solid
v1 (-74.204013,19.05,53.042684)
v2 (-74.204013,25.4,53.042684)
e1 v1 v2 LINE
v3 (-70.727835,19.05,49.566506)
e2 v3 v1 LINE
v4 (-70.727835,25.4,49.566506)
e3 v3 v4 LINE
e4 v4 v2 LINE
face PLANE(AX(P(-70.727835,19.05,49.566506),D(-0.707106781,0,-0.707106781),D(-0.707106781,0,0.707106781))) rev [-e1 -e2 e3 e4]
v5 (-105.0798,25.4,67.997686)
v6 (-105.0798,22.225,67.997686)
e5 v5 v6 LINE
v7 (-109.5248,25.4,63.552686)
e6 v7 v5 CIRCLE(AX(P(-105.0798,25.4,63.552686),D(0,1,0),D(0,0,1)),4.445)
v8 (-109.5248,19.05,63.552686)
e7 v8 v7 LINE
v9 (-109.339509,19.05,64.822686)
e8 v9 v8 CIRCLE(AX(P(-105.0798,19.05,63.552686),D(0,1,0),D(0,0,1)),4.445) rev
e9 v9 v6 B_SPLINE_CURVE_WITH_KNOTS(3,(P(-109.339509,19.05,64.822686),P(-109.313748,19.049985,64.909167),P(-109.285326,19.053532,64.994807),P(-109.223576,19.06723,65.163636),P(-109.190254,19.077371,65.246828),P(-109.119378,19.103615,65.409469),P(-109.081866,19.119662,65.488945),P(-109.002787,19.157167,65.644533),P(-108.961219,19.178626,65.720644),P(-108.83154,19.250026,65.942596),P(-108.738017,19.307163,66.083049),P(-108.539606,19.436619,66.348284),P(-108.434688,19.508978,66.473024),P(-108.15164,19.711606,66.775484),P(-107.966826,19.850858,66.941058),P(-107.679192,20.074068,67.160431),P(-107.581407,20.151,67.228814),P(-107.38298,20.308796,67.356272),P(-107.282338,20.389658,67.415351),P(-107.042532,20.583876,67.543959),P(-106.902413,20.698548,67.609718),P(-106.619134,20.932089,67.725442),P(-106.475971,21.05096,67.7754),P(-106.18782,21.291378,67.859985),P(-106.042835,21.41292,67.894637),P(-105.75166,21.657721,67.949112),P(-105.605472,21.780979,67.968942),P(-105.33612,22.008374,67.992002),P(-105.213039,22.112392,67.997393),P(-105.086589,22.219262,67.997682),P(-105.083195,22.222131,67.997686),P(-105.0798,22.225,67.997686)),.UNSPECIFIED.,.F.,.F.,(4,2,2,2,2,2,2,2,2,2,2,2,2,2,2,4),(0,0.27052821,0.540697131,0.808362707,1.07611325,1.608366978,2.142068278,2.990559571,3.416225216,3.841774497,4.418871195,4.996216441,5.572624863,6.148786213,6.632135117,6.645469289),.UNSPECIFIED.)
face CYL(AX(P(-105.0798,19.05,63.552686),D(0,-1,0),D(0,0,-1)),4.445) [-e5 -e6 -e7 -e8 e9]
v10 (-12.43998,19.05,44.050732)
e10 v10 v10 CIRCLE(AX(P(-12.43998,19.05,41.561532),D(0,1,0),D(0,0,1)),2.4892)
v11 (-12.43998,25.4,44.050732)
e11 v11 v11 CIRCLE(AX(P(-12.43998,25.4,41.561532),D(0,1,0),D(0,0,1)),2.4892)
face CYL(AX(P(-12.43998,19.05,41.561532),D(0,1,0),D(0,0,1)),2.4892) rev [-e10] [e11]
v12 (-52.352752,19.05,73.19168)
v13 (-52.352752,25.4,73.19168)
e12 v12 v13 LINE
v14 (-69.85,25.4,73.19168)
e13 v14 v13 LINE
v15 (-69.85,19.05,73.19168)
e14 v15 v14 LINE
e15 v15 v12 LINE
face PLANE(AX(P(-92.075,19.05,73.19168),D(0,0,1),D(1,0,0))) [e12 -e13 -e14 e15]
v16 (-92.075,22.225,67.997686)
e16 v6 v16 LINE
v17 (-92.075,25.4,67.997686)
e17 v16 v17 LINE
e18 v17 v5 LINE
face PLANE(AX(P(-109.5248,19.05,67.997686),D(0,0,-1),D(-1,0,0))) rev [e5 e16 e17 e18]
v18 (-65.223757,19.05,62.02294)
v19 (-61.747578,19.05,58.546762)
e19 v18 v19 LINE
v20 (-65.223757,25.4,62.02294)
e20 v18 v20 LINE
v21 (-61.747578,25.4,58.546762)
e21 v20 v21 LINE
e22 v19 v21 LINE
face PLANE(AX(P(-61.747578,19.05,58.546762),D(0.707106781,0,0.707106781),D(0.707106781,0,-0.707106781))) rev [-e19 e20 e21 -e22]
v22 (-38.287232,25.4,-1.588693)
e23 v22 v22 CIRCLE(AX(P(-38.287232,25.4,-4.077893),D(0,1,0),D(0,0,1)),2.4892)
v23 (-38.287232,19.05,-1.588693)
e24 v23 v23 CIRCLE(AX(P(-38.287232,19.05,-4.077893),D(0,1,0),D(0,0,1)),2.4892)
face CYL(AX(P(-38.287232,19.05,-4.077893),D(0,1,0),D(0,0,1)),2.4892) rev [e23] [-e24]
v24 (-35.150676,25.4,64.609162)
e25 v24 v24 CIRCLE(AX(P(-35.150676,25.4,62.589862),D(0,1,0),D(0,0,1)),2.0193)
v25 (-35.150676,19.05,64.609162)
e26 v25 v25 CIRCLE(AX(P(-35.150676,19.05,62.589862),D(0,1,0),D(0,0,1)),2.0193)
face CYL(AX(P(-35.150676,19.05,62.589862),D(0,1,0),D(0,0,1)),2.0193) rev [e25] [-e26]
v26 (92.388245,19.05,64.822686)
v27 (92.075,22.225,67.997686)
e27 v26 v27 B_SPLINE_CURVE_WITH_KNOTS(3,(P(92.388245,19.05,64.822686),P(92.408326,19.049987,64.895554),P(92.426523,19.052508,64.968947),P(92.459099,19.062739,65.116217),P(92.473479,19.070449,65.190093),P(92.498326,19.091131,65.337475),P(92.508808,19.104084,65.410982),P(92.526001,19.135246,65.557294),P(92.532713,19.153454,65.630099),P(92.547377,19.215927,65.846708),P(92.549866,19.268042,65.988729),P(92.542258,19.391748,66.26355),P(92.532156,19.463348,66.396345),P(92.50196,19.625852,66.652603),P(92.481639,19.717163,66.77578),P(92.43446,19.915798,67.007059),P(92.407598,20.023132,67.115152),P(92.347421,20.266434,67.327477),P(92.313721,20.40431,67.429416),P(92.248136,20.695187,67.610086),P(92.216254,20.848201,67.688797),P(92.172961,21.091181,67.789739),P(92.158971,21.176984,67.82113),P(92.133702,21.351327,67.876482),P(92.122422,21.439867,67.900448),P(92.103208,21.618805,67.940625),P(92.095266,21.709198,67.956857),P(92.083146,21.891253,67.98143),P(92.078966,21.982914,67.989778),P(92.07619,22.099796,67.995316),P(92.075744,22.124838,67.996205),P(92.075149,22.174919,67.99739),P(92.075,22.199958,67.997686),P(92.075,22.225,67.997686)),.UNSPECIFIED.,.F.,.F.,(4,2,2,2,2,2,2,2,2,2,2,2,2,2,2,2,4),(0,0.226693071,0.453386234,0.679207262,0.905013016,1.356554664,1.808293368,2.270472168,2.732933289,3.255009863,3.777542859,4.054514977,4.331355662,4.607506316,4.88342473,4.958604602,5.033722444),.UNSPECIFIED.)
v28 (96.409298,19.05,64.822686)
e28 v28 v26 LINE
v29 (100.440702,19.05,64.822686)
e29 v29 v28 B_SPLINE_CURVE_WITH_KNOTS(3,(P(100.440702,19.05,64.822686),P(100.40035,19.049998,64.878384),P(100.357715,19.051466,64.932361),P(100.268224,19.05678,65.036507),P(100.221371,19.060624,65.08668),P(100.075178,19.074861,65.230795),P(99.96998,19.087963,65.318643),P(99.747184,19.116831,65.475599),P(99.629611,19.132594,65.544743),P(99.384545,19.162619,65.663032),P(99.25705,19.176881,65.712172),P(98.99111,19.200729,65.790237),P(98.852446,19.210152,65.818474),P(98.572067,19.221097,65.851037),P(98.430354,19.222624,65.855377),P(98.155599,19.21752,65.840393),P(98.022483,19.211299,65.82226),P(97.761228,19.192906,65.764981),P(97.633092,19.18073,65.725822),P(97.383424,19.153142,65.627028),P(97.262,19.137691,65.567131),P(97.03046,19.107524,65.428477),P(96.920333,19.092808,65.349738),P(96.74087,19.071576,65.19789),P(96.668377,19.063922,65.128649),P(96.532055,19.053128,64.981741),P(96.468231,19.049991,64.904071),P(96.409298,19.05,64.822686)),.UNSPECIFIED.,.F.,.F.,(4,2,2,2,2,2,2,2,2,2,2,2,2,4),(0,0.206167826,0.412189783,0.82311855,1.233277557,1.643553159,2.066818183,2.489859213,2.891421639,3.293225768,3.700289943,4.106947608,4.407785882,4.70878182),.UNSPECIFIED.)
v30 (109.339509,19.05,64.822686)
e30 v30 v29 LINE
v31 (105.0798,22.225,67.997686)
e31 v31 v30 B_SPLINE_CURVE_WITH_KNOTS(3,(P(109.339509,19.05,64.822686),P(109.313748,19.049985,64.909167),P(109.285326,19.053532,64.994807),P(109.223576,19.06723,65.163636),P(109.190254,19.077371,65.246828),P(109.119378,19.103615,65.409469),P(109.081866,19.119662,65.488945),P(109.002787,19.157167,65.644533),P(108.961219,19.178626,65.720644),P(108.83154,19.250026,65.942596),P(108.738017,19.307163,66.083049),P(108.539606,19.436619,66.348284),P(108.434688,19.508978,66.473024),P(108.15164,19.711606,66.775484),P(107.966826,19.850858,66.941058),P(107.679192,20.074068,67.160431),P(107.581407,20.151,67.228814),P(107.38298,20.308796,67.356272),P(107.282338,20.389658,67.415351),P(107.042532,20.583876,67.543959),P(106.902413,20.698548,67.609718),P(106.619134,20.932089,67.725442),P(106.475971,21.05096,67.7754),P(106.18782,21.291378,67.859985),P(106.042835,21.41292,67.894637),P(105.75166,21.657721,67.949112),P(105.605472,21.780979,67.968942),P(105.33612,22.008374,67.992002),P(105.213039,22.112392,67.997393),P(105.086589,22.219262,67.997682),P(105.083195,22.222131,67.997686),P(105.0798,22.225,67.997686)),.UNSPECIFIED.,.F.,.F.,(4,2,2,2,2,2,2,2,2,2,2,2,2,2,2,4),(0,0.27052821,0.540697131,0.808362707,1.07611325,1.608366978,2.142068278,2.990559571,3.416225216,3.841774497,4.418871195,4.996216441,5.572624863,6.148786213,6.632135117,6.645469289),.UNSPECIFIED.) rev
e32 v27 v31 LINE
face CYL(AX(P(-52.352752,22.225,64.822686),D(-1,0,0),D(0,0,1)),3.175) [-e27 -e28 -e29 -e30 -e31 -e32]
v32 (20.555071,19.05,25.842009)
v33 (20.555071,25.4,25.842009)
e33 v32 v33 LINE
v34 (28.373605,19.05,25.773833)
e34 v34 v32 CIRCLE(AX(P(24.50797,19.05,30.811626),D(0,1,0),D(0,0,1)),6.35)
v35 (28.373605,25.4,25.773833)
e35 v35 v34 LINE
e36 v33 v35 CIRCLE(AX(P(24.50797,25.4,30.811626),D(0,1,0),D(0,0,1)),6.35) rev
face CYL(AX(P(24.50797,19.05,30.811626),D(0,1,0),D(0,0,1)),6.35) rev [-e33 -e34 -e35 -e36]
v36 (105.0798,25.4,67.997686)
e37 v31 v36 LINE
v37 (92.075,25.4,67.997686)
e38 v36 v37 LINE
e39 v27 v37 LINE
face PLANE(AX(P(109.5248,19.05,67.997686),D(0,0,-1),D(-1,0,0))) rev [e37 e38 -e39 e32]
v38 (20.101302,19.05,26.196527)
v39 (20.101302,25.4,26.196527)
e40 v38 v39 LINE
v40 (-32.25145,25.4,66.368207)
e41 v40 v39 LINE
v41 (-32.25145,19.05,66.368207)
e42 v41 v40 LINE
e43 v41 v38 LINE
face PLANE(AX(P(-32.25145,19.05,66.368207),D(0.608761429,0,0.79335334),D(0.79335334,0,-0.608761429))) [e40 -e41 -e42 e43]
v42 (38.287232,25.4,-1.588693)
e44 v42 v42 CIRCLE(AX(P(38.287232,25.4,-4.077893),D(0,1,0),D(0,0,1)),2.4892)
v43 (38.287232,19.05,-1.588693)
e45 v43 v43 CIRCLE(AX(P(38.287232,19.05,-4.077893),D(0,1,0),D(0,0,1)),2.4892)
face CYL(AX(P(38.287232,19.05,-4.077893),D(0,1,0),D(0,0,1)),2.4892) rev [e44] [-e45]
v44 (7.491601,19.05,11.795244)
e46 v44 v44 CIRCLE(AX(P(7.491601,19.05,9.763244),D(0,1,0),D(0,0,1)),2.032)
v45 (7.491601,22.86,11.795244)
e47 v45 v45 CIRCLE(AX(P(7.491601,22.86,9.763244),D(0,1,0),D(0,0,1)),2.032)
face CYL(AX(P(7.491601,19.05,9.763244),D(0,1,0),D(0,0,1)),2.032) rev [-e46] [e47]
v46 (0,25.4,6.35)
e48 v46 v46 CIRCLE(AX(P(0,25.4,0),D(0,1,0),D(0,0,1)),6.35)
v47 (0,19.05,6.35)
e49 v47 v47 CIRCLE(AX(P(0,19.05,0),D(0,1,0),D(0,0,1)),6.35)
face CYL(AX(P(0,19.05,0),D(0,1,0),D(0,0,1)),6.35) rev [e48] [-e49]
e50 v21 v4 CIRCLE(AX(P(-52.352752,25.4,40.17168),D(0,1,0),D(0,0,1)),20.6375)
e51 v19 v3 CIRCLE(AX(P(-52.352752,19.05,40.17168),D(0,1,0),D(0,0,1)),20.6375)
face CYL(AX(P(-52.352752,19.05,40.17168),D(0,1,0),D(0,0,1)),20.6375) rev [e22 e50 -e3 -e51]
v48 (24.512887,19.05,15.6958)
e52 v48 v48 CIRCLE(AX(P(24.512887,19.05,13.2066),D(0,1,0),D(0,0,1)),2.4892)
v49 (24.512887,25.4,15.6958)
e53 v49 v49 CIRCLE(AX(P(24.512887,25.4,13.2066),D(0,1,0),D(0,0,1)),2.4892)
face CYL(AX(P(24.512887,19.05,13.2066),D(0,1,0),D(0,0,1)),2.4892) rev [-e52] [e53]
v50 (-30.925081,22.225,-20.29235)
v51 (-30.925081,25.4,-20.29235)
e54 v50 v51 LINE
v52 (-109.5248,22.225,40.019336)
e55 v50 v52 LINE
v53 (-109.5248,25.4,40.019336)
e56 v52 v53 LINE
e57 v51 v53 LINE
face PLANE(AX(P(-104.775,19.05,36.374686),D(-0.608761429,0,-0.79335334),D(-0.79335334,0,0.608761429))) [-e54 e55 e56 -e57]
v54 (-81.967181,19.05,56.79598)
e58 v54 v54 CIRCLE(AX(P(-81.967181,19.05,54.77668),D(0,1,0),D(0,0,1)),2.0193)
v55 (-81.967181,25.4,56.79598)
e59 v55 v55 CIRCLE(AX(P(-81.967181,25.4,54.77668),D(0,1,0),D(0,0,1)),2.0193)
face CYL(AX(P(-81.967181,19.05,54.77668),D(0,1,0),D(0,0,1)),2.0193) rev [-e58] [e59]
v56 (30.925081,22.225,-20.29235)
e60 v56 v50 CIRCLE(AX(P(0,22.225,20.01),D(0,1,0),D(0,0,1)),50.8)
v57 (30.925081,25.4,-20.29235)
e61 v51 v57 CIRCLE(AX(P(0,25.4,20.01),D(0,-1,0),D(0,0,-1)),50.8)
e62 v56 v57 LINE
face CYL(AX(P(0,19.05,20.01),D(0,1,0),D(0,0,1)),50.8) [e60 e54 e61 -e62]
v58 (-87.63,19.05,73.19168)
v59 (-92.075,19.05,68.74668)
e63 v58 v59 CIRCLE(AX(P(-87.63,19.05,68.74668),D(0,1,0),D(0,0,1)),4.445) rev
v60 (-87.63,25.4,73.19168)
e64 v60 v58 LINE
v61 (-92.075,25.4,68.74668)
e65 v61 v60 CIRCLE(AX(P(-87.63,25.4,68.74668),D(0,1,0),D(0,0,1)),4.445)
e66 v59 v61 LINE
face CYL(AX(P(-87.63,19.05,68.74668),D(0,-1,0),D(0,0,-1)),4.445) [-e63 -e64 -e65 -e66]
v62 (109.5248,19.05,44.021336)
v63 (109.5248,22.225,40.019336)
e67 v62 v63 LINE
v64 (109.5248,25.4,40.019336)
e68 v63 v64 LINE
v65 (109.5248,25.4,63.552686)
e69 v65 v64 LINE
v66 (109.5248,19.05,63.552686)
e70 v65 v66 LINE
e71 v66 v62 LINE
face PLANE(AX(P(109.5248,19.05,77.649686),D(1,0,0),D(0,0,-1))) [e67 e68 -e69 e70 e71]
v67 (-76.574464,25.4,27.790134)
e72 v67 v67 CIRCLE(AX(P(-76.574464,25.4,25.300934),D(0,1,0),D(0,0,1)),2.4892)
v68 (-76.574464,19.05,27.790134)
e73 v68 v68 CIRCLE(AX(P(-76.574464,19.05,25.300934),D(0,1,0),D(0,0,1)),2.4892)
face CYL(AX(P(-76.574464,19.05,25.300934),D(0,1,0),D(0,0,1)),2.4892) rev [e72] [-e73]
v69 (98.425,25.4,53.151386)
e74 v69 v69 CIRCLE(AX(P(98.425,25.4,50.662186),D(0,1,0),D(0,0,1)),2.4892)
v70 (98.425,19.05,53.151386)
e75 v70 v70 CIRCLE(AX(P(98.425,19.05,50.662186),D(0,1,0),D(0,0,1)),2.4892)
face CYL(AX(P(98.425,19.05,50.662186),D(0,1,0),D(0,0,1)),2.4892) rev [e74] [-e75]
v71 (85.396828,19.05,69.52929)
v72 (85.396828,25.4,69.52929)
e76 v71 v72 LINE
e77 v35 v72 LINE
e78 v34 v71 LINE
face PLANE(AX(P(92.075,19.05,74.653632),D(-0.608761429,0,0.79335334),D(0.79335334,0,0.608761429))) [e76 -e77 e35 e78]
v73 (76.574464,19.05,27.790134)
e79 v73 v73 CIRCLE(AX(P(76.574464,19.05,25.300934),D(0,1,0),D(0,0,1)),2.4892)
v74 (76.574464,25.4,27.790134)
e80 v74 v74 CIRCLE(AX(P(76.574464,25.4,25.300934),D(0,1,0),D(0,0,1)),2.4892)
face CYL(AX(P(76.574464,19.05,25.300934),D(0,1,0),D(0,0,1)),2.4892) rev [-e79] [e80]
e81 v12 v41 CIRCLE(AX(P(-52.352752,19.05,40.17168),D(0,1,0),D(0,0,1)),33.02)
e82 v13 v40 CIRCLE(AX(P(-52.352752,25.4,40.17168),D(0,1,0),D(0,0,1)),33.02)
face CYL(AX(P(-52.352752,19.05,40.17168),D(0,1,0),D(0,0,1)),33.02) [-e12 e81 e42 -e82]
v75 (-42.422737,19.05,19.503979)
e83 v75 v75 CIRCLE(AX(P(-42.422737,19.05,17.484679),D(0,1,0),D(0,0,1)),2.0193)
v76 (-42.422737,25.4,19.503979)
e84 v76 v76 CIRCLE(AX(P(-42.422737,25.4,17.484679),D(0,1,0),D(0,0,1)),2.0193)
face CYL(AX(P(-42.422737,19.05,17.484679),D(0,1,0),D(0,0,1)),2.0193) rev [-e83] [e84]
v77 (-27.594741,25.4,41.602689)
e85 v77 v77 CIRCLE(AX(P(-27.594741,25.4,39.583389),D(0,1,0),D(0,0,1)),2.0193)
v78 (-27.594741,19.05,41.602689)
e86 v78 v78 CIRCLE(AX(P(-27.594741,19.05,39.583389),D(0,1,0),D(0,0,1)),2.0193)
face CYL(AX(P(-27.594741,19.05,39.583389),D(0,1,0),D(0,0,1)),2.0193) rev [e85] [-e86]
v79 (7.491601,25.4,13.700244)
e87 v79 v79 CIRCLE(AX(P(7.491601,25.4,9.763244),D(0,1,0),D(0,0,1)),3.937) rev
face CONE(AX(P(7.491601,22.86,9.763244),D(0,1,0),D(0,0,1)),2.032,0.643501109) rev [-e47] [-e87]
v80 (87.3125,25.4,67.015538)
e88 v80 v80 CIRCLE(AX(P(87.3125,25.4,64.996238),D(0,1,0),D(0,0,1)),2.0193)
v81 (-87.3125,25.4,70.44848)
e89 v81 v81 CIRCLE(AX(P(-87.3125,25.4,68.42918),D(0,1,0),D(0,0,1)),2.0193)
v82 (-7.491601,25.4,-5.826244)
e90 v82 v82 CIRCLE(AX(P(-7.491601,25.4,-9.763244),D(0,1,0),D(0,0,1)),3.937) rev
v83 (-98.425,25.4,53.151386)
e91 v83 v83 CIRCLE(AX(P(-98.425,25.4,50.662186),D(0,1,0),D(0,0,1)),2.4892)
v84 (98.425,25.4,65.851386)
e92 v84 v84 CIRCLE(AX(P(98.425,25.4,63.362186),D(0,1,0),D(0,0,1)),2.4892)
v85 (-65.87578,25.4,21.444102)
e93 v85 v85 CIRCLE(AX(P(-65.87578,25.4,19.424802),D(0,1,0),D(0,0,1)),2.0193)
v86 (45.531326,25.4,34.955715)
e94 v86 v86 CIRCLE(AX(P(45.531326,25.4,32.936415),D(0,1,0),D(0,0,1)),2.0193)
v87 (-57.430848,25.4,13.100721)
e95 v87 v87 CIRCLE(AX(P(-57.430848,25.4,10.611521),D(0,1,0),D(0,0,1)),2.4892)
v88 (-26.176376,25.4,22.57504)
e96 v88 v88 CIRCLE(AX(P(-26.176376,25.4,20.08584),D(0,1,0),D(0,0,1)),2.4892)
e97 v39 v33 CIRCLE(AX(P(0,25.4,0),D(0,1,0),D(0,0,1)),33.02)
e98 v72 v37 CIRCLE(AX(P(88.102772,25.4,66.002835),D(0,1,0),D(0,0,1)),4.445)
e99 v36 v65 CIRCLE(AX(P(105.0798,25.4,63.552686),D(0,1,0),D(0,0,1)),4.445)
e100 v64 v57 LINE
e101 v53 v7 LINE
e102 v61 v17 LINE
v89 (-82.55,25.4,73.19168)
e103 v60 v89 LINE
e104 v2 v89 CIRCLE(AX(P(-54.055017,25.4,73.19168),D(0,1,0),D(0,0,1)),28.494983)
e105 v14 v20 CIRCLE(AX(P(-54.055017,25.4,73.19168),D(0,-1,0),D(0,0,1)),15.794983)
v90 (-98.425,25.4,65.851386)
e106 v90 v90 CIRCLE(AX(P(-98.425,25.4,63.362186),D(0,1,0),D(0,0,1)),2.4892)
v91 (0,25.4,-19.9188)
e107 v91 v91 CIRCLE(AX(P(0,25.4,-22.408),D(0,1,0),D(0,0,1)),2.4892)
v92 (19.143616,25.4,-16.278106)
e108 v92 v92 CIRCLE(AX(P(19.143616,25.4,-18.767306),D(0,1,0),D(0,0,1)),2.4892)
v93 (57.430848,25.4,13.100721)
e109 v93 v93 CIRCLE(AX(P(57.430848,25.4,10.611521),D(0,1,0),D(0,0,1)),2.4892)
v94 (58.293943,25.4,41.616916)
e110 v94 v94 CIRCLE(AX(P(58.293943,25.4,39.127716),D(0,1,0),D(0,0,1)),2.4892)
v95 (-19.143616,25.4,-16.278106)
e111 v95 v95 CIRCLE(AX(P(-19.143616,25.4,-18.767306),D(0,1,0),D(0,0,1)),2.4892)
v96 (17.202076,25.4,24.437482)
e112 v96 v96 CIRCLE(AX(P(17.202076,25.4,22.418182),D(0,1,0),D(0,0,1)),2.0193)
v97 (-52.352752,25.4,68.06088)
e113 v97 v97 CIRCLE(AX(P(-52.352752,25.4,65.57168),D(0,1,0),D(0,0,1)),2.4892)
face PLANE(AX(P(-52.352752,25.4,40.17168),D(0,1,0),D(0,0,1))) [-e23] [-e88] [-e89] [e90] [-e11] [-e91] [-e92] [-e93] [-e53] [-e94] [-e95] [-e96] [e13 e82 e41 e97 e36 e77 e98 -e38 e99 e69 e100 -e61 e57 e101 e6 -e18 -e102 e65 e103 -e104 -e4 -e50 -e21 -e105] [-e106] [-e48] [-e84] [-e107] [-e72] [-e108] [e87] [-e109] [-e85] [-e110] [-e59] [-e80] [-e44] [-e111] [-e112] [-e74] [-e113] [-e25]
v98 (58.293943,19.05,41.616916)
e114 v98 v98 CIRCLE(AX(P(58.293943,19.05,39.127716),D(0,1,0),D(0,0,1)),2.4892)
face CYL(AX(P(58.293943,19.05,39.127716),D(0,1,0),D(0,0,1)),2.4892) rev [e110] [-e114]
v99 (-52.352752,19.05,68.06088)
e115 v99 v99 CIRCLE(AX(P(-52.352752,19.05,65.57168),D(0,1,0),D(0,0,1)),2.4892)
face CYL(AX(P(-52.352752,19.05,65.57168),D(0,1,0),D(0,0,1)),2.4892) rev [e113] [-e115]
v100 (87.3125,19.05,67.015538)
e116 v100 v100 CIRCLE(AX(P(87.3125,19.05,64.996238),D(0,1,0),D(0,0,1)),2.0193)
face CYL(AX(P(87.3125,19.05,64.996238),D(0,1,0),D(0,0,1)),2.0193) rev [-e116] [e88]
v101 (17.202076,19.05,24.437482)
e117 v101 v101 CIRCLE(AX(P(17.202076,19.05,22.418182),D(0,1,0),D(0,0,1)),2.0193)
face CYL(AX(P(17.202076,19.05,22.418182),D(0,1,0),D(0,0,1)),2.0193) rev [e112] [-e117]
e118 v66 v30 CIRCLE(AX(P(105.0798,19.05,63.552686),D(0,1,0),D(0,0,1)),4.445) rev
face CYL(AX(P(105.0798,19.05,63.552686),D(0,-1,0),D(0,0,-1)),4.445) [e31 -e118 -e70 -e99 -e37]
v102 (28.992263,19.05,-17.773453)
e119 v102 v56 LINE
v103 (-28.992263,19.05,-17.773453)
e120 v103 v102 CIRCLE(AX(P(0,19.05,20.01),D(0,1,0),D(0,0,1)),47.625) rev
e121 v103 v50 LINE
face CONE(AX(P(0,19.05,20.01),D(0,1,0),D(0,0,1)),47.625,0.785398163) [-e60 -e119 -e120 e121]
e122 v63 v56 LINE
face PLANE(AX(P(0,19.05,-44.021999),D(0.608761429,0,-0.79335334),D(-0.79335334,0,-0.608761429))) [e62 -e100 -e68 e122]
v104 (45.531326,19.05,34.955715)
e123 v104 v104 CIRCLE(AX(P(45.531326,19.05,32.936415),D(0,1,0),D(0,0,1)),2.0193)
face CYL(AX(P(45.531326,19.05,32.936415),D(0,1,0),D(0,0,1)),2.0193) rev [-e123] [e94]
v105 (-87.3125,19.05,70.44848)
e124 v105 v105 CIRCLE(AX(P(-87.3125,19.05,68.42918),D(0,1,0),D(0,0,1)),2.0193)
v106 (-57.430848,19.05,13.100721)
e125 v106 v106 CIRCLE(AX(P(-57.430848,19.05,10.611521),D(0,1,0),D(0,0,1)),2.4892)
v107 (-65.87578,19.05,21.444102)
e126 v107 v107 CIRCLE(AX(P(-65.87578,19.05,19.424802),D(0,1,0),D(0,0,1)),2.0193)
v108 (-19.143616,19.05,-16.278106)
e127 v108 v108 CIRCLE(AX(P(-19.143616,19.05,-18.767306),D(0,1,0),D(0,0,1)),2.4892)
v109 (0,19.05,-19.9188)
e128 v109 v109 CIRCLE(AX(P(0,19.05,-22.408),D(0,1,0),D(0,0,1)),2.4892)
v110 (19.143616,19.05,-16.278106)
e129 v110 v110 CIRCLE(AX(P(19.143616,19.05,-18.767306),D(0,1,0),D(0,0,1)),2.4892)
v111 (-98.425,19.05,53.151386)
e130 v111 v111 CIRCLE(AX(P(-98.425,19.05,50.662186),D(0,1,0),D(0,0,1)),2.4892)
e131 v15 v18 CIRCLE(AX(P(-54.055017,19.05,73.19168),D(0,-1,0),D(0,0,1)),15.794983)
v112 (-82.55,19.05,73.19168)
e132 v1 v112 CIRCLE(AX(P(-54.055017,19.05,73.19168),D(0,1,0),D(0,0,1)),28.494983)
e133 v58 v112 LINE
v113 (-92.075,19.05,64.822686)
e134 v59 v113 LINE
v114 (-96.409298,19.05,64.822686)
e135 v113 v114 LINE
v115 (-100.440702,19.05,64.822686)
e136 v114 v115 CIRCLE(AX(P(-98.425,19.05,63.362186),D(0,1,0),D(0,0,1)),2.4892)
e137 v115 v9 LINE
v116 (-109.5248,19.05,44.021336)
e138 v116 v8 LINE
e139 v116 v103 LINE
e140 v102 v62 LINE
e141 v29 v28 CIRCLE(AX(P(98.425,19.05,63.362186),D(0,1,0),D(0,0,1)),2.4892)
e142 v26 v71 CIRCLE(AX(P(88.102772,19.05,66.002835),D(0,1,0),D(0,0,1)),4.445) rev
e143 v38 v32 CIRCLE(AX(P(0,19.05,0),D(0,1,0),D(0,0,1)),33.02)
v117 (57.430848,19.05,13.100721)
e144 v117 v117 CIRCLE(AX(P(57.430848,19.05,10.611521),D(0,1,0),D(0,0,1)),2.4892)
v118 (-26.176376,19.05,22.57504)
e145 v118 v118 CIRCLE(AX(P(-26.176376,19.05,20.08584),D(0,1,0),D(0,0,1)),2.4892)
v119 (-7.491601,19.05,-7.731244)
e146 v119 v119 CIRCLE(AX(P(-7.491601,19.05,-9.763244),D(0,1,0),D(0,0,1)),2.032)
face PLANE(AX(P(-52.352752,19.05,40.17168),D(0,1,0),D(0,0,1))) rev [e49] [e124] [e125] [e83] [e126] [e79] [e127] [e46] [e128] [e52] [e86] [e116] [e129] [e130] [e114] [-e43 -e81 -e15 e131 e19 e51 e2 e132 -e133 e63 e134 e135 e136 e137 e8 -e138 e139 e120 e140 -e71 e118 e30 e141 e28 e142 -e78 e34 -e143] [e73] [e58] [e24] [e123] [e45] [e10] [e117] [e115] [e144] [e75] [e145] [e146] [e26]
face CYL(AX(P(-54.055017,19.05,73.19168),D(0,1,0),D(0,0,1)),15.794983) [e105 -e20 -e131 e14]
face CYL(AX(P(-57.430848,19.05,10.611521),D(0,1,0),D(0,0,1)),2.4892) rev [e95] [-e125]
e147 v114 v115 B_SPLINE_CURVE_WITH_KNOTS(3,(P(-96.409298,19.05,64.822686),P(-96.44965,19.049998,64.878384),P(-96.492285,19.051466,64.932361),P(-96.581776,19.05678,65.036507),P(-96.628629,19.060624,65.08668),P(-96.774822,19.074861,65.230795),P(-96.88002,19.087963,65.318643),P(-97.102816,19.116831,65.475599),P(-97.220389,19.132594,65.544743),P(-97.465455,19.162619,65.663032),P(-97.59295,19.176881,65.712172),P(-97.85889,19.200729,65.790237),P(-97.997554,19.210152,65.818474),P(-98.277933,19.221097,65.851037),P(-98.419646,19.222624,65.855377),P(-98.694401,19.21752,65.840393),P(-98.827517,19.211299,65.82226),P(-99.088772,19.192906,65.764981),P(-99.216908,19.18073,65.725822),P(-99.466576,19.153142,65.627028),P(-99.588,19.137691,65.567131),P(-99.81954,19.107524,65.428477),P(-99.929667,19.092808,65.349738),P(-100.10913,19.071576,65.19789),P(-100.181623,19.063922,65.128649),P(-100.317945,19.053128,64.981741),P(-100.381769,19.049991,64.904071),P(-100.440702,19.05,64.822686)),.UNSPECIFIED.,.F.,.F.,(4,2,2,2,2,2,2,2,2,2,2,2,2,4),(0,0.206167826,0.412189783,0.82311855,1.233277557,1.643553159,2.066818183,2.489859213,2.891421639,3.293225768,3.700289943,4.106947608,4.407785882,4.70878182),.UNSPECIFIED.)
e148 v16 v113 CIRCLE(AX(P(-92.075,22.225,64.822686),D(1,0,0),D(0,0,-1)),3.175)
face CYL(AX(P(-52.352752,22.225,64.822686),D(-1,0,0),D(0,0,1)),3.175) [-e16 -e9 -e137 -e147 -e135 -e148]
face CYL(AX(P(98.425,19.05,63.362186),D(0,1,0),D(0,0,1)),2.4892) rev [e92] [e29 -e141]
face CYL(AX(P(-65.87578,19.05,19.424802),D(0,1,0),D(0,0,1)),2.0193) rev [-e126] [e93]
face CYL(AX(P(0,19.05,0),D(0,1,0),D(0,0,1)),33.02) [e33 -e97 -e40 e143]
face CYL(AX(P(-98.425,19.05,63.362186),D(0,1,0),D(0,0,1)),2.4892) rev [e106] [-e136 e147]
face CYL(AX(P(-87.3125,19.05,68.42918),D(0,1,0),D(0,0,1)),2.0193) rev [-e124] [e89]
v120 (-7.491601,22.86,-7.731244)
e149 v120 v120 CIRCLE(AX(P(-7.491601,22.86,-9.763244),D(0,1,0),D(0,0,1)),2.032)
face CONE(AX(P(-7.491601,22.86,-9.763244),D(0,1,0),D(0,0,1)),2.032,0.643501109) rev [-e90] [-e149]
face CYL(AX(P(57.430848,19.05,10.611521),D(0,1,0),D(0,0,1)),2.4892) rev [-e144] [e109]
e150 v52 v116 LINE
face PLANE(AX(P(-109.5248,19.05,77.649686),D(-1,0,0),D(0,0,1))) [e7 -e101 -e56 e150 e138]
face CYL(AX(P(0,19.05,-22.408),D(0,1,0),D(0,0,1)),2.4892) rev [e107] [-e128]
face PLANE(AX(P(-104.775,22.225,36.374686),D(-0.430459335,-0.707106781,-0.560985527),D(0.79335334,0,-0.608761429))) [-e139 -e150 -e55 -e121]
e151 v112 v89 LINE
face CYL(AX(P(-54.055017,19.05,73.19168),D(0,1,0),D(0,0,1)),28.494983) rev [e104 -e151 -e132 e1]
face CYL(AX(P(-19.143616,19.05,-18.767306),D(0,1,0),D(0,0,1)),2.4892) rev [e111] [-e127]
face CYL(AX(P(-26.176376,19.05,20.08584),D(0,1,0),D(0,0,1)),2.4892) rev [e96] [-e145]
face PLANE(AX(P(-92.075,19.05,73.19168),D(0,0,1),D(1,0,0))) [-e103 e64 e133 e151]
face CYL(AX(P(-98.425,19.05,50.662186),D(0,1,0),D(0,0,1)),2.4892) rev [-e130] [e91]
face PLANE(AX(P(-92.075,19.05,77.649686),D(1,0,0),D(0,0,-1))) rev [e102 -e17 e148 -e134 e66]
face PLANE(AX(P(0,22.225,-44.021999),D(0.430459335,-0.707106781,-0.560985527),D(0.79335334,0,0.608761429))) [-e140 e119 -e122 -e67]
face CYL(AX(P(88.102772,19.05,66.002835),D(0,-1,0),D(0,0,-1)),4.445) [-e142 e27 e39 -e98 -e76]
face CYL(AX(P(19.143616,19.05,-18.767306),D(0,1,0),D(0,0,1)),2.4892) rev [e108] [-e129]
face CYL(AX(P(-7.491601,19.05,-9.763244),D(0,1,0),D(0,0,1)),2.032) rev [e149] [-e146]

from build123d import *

# Parameters (mm, degrees)
SKETCH3_R                          = 20.6375
SKETCH3_R_2                        = 6.35
BOSS_EXTRUDE1_DEPTH                = 6.35
SKETCH8_W                          = 4.7498
SKETCH8_H                          = 41.275
BOSS_EXTRUDE4_DEPTH                = 6.35
SKETCH9_R                          = 2.032
COLLAR_HOLES_DEPTH                 = 135.407879484
SKETCH10_R                         = 2.0193
SPACER_HOLES_DEPTH                 = 135.407879484
SPACER_HOLE_PATTERN_COUNT          = 5
SPACER_HOLE_PATTERN_PITCH          = 24.13
SPACER_HOLE_MIRROR_COPY_1_SKETCH_R = 2.0193
SPACER_HOLE_MIRROR_COPY_1_DEPTH    = 135.407879484
SPACER_HOLE_MIRROR_COPY_2_SKETCH_R = 2.0193
SPACER_HOLE_MIRROR_COPY_2_DEPTH    = 135.407879484
SPACER_HOLE_MIRROR_COPY_3_SKETCH_R = 2.0193
SPACER_HOLE_MIRROR_COPY_3_DEPTH    = 135.407879484
SPACER_HOLE_MIRROR_COPY_4_SKETCH_R = 2.0193
SPACER_HOLE_MIRROR_COPY_4_DEPTH    = 135.407879484
SPACER_HOLE_MIRROR_COPY_5_SKETCH_R = 2.0193
SPACER_HOLE_MIRROR_COPY_5_DEPTH    = 135.407879484
SKETCH16_R                         = 2.0193
CUSTOM_NUTSTRIP_HOLES_DEPTH        = 135.407879484
SKETCH36_R                         = 2.0193
AUX_SPACER_HOLES_DEPTH             = 135.407879484
SKETCH49_R                         = 2.0193
CUT_EXTRUDE23_DEPTH                = 135.407879484
SKETCH50_R                         = 2.0193
CUT_EXTRUDE24_DEPTH                = 135.407879484
SKETCH58_R                         = 2.0193
CUT_EXTRUDE30_DEPTH                = 135.407879484
SKETCH11_R                         = 2.4892
ENLARGE_SPACER_HOLES_DEPTH         = 135.407879484
TOP_CHAMFER_SIZE                   = 1.905
TOP_CHAMFER_SIZE2                  = 2.54
CUT_EXTRUDE34_DEPTH                = 135.407879484
CUT_EXTRUDE52_DEPTH                = 135.407879484
SKETCH110_W                        = 17.4498
SKETCH110_H                        = 9.652
CUT_EXTRUDE56_DEPTH                = 135.407879484
CHAMFER4_SIZE                      = 3.175
FILLET21_R                         = 6.35
FILLET41_R                         = 4.445
FILLET45_R                         = 3.175


with BuildPart() as part:
    # Sketch3 → Boss-Extrude1 (new body)
    with BuildSketch(Plane(origin=(0, 25.4, 0), x_dir=(1, 0, 0), z_dir=(0, 1, 0))):
        with BuildLine():
            Line((-104.775, -36.374686106), (-30.925080594, 20.292350114))
            Line((-30.925080594, 20.292350114), (0, 44.021999059))
            Line((0, 44.021999059), (30.925080594, 20.292350114))
            Line((30.925080594, 20.292350114), (104.775, -36.374686106))
            Line((104.775, -36.374686106), (104.775, -77.649686106))
            Line((104.775, -77.649686106), (92.075, -77.649686106))
            Line((92.075, -77.649686106), (92.075, -74.653632333))
            Line((92.075, -74.653632333), (24.142327736, -22.527059539))
            ThreePointArc((24.142327736, -22.527059539), (22.197769032, -24.445438225), (20.101302386, -26.196527296))
            Line((20.101302386, -26.196527296), (-32.251449857, -66.368206988))
            ThreePointArc((-32.251449857, -66.368206988), (-41.738821099, -71.439312567), (-52.352752243, -73.191679691))
            Line((-52.352752243, -73.191679691), (-92.075, -73.191679691))
            Line((-92.075, -73.191679691), (-92.075, -77.649686106))
            Line((-92.075, -77.649686106), (-104.775, -77.649686106))
            Line((-104.775, -77.649686106), (-104.775, -36.374686106))
        make_face()
        with Locations(Location((-52.352752243, -40.171679691, 0), (0, 0, 270))):
            Circle(SKETCH3_R, mode=Mode.SUBTRACT)
        with Locations(Location((0, 0, 0), (0, 0, 270))):
            Circle(SKETCH3_R_2, mode=Mode.SUBTRACT)
    extrude(amount=-BOSS_EXTRUDE1_DEPTH)

    # Sketch8 → Boss-Extrude4 (add, through all)
    with BuildSketch(Plane(origin=(0, 25.4, 0), x_dir=(1, 0, 0), z_dir=(0, 1, 0))):
        with Locations((-107.1499, -57.012186106)):
            Rectangle(SKETCH8_W, SKETCH8_H)
        with Locations((107.1499, -57.012186106)):
            Rectangle(SKETCH8_W, SKETCH8_H)
    extrude(amount=-BOSS_EXTRUDE4_DEPTH)

    # Sketch9 → Collar Holes (cut, through all)
    with BuildSketch(Plane(origin=(0, 25.4, 0), x_dir=(1, 0, 0), z_dir=(0, 1, 0))):
        with Locations(Location((-7.491600774, 9.763244212, 0), (0, 0, 270))):
            Circle(SKETCH9_R)
        with Locations(Location((7.491600774, -9.763244212, 0), (0, 0, 270))):
            Circle(SKETCH9_R)
    extrude(amount=-COLLAR_HOLES_DEPTH, mode=Mode.SUBTRACT)

    # Sketch10 → Spacer Holes (cut, through all)
    with BuildSketch(Plane(origin=(0, 25.4, 0), x_dir=(1, 0, 0), z_dir=(0, 1, 0))):
        with Locations(Location((0, 33.456719285, 0), (0, 0, 270))):
            Circle(SKETCH10_R)
    spacer_holes = extrude(amount=-SPACER_HOLES_DEPTH, mode=Mode.SUBTRACT)

    # Spacer Hole Pattern: Spacer Holes ×5
    with Locations(*[Vector(-0.7933533402912316, 0, 0.6087614290087253) * (i * SPACER_HOLE_PATTERN_PITCH) for i in range(1, SPACER_HOLE_PATTERN_COUNT)]):
        add(spacer_holes, mode=Mode.SUBTRACT)

    # Spacer Hole Mirror copy 1 sketch → Spacer Hole Mirror copy 1 (cut, through all)
    with BuildSketch(Plane(origin=(19.143616101, 25.4, 14.689413282), x_dir=(-1, 0, 0), z_dir=(0, 1, 0))):
        with Locations((0, -33.456719285)):
            Circle(SPACER_HOLE_MIRROR_COPY_1_SKETCH_R)
    extrude(amount=-SPACER_HOLE_MIRROR_COPY_1_DEPTH, mode=Mode.SUBTRACT)

    # Spacer Hole Mirror copy 2 sketch → Spacer Hole Mirror copy 2 (cut, through all)
    with BuildSketch(Plane(origin=(38.287232202, 25.4, 29.378826564), x_dir=(-1, 0, 0), z_dir=(0, 1, 0))):
        with Locations((0, -33.456719285)):
            Circle(SPACER_HOLE_MIRROR_COPY_2_SKETCH_R)
    extrude(amount=-SPACER_HOLE_MIRROR_COPY_2_DEPTH, mode=Mode.SUBTRACT)

    # Spacer Hole Mirror copy 3 sketch → Spacer Hole Mirror copy 3 (cut, through all)
    with BuildSketch(Plane(origin=(57.430848304, 25.4, 44.068239846), x_dir=(-1, 0, 0), z_dir=(0, 1, 0))):
        with Locations((0, -33.456719285)):
            Circle(SPACER_HOLE_MIRROR_COPY_3_SKETCH_R)
    extrude(amount=-SPACER_HOLE_MIRROR_COPY_3_DEPTH, mode=Mode.SUBTRACT)

    # Spacer Hole Mirror copy 4 sketch → Spacer Hole Mirror copy 4 (cut, through all)
    with BuildSketch(Plane(origin=(76.574464405, 25.4, 58.757653128), x_dir=(-1, 0, 0), z_dir=(0, 1, 0))):
        with Locations((0, -33.456719285)):
            Circle(SPACER_HOLE_MIRROR_COPY_4_SKETCH_R)
    extrude(amount=-SPACER_HOLE_MIRROR_COPY_4_DEPTH, mode=Mode.SUBTRACT)

    # Spacer Hole Mirror copy 5 sketch → Spacer Hole Mirror copy 5 (cut, through all)
    with BuildSketch(Plane(origin=(0, 25.4, 0), x_dir=(-1, 0, 0), z_dir=(0, 1, 0))):
        with Locations((0, -33.456719285)):
            Circle(SPACER_HOLE_MIRROR_COPY_5_SKETCH_R)
    extrude(amount=-SPACER_HOLE_MIRROR_COPY_5_DEPTH, mode=Mode.SUBTRACT)

    # Sketch16 → Custom Nutstrip Holes (cut, through all)
    with BuildSketch(Plane(origin=(0, 25.4, 0), x_dir=(1, 0, 0), z_dir=(0, 1, 0))):
        with Locations(Location((-98.425, -50.662186106, 0), (0, 0, 270))):
            Circle(SKETCH16_R)
        with Locations(Location((-98.425, -63.362186106, 0), (0, 0, 270))):
            Circle(SKETCH16_R)
        with Locations(Location((98.425, -63.362186106, 0), (0, 0, 90))):
            Circle(SKETCH16_R)
        with Locations(Location((98.425, -50.662186106, 0), (0, 0, 90))):
            Circle(SKETCH16_R)
    extrude(amount=-CUSTOM_NUTSTRIP_HOLES_DEPTH, mode=Mode.SUBTRACT)

    # Sketch36 → Aux Spacer Holes (cut, through all)
    with BuildSketch(Plane(origin=(0, 25.4, 0), x_dir=(1, 0, 0), z_dir=(0, 1, 0))):
        with Locations(Location((-52.352752243, -65.571679691, 0), (0, 0, 270))):
            Circle(SKETCH36_R)
        with Locations(Location((58.293943402, -39.127716128, 0), (0, 0, 270))):
            Circle(SKETCH36_R)
        with Locations(Location((24.512886804, -13.206599718, 0), (0, 0, 270))):
            Circle(SKETCH36_R)
        with Locations(Location((-12.439980265, -41.561531903, 0), (0, 0, 270))):
            Circle(SKETCH36_R)
        with Locations(Location((-26.176376122, -20.085839846, 0), (0, 0, 270))):
            Circle(SKETCH36_R)
    extrude(amount=-AUX_SPACER_HOLES_DEPTH, mode=Mode.SUBTRACT)

    # Sketch49 → Cut-Extrude23 (cut, through all)
    with BuildSketch(Plane(origin=(0, 25.4, 0), x_dir=(1, 0, 0), z_dir=(0, 1, 0))):
        with Locations(Location((-81.967180737, -54.776679691, 0), (0, 0, 270))):
            Circle(SKETCH49_R)
        with Locations(Location((-65.875779659, -19.424801504, 0), (0, 0, 270))):
            Circle(SKETCH49_R)
        with Locations(Location((-42.422737009, -17.484678513, 0), (0, 0, 270))):
            Circle(SKETCH49_R)
        with Locations(Location((-27.594740634, -39.583388821, 0), (0, 0, 270))):
            Circle(SKETCH49_R)
    extrude(amount=-CUT_EXTRUDE23_DEPTH, mode=Mode.SUBTRACT)

    # Sketch50 → Cut-Extrude24 (cut, through all)
    with BuildSketch(Plane(origin=(0, 25.4, 0), x_dir=(1, 0, 0), z_dir=(0, 1, 0))):
        with Locations(Location((-87.3125, -68.429179691, 0), (0, 0, 270))):
            Circle(SKETCH50_R)
        with Locations(Location((-35.150676163, -62.589861704, 0), (0, 0, 270))):
            Circle(SKETCH50_R)
        with Locations(Location((17.20207608, -22.418182013, 0), (0, 0, 270))):
            Circle(SKETCH50_R)
        with Locations(Location((45.531325629, -32.936414996, 0), (0, 0, 270))):
            Circle(SKETCH50_R)
        with Locations(Location((87.3125, -64.996237681, 0), (0, 0, 270))):
            Circle(SKETCH50_R)
    extrude(amount=-CUT_EXTRUDE24_DEPTH, mode=Mode.SUBTRACT)

    # Sketch58 → Cut-Extrude30 (cut, through all)
    with BuildSketch(Plane(origin=(0, 25.4, 0), x_dir=(1, 0, 0), z_dir=(0, 1, 0))):
        with Locations(Location((0, 22.408000428, 0), (0, 0, 270))):
            Circle(SKETCH58_R)
        with BuildLine():
            Line((-30.925080594, 20.292350114), (0, 44.021999059))
            Line((0, 44.021999059), (30.925080594, 20.292350114))
            ThreePointArc((30.925080594, 20.292350114), (0, 30.790000428), (-30.925080594, 20.292350114))
        make_face()
    extrude(amount=-CUT_EXTRUDE30_DEPTH, mode=Mode.SUBTRACT)

    # Sketch11 → Enlarge Spacer Holes (cut, through all)
    with BuildSketch(Plane(origin=(0, 25.4, 0), x_dir=(1, 0, 0), z_dir=(0, 1, 0))):
        with Locations(Location((0, 22.408000428, 0), (0, 0, 270))):
            Circle(SKETCH11_R)
        with Locations(Location((-76.574464405, -25.300933843, 0), (0, 0, 270))):
            Circle(SKETCH11_R)
        with Locations(Location((-57.430848304, -10.611520561, 0), (0, 0, 270))):
            Circle(SKETCH11_R)
        with Locations(Location((-38.287232202, 4.077892721, 0), (0, 0, 270))):
            Circle(SKETCH11_R)
        with Locations(Location((-19.143616101, 18.767306003, 0), (0, 0, 270))):
            Circle(SKETCH11_R)
        with Locations(Location((19.143616101, 18.767306003, 0), (0, 0, 270))):
            Circle(SKETCH11_R)
        with Locations(Location((38.287232202, 4.077892721, 0), (0, 0, 270))):
            Circle(SKETCH11_R)
        with Locations(Location((57.430848304, -10.611520561, 0), (0, 0, 270))):
            Circle(SKETCH11_R)
        with Locations(Location((76.574464405, -25.300933843, 0), (0, 0, 270))):
            Circle(SKETCH11_R)
        with Locations(Location((-52.352752243, -65.571679691, 0), (0, 0, 270))):
            Circle(SKETCH11_R)
        with Locations(Location((-98.425, -50.662186106, 0), (0, 0, 270))):
            Circle(SKETCH11_R)
        with Locations(Location((-98.425, -63.362186106, 0), (0, 0, 270))):
            Circle(SKETCH11_R)
        with Locations(Location((98.425, -50.662186106, 0), (0, 0, 270))):
            Circle(SKETCH11_R)
        with Locations(Location((98.425, -63.362186106, 0), (0, 0, 270))):
            Circle(SKETCH11_R)
        with Locations(Location((-26.176376122, -20.085839846, 0), (0, 0, 270))):
            Circle(SKETCH11_R)
        with Locations(Location((-12.439980265, -41.561531903, 0), (0, 0, 270))):
            Circle(SKETCH11_R)
        with Locations(Location((24.512886804, -13.206599718, 0), (0, 0, 270))):
            Circle(SKETCH11_R)
        with Locations(Location((58.293943402, -39.127716128, 0), (0, 0, 270))):
            Circle(SKETCH11_R)
    extrude(amount=-ENLARGE_SPACER_HOLES_DEPTH, mode=Mode.SUBTRACT)

    # Top Chamfer
    top_chamfer_edges = [part.edges().sort_by_distance(p)[0] for p in [
        (-7.491600774, 25.4, -11.795244212),
        (7.491600774, 25.4, 7.731244212),
    ]]
    top_chamfer_side = [part.faces().sort_by_distance(p)[0] for p in [
        (-0.702147429, 25.4, 26.179434033),
    ]]
    chamfer(top_chamfer_edges, length=TOP_CHAMFER_SIZE, length2=TOP_CHAMFER_SIZE2, reference=top_chamfer_side[0])

    # Sketch75 → Cut-Extrude34 (cut, through all)
    with BuildSketch(Plane(origin=(0, 25.4, 0), x_dir=(1, 0, 0), z_dir=(0, 1, 0))):
        Polygon((-104.775, -36.374686106), (-109.5248, -40.019335834), (-109.5248, -36.374686106), align=None)
        Polygon((104.775, -36.374686106), (109.5248, -40.019335834), (109.5248, -36.374686106), align=None)
    extrude(amount=-CUT_EXTRUDE34_DEPTH, mode=Mode.SUBTRACT)

    # Sketch101 → Cut-Extrude52 (cut, through all)
    with BuildSketch(Plane(origin=(0, 25.4, 0), x_dir=(1, 0, 0), z_dir=(0, 1, 0))):
        with BuildLine():
            Line((-61.747578382, -58.546761951), (-65.223756626, -62.022940195))
            ThreePointArc((-65.223756626, -62.022940195), (-68.64767852, -67.147201432), (-69.85, -73.191679691))
            Line((-69.85, -73.191679691), (-82.55, -73.191679691))
            ThreePointArc((-82.55, -73.191679691), (-80.380948583, -62.287121841), (-74.204012747, -53.042684074))
            Line((-74.204012747, -53.042684074), (-70.727834503, -49.56650583))
            Line((-70.727834503, -49.56650583), (-61.747578382, -58.546761951))
        make_face()
    extrude(amount=-CUT_EXTRUDE52_DEPTH, mode=Mode.SUBTRACT)

    # Sketch110 → Cut-Extrude56 (cut, through all)
    with BuildSketch(Plane(origin=(0, 25.4, 0), x_dir=(1, 0, 0), z_dir=(0, 1, 0))):
        with Locations((-100.7999, -72.823686106)):
            Rectangle(SKETCH110_W, SKETCH110_H)
        with Locations((100.7999, -72.823686106)):
            Rectangle(SKETCH110_W, SKETCH110_H)
    extrude(amount=-CUT_EXTRUDE56_DEPTH, mode=Mode.SUBTRACT)

    # Chamfer4
    chamfer4_edges = [part.edges().sort_by_distance(p)[0] for p in [
        (-70.224940297, 19.05, 9.86349286),
        (0, 19.05, -30.790000428),
        (70.224940297, 19.05, 9.86349286),
    ]]
    chamfer(chamfer4_edges, length=CHAMFER4_SIZE)

    # Fillet21
    fillet21_edges = [part.edges().sort_by_distance(p)[0] for p in [
        (24.142327736, 22.225, 22.527059539),
    ]]
    fillet(fillet21_edges, radius=FILLET21_R)

    # Fillet41
    # the kernel refuses this fillet: 4.445 mm, written as the material it takes off along each edge
    with BuildSketch(Plane(origin=(109.5248, 36.5125, 67.997686106), x_dir=(-1, 0, 0), z_dir=(0, -1, 0)), Plane(origin=(-109.5248, 36.5125, 67.997686106), x_dir=(0, 0, -1), z_dir=(0, -1, 0))) as fillet41_piece_1:
        with BuildLine():
            CenterArc((FILLET41_R, FILLET41_R), FILLET41_R, 180, 90)
            Line((0, FILLET41_R), (-FILLET41_R * 0.02, FILLET41_R))
            Line((-FILLET41_R * 0.02, FILLET41_R), (-FILLET41_R * 0.02, -FILLET41_R * 0.02))
            Line((-FILLET41_R * 0.02, -FILLET41_R * 0.02), (FILLET41_R, -FILLET41_R * 0.02))
            Line((FILLET41_R, -FILLET41_R * 0.02), (FILLET41_R, 0))
        make_face()
    extrude(amount=28.575, mode=Mode.SUBTRACT)
    with BuildSketch(Plane(origin=(92.075, 46.444130009, 74.653632333), x_dir=(-0.7933533402912316, 0, -0.6087614290087255), z_dir=(0, -1, 0))) as fillet41_piece_2:
        with BuildLine():
            CenterArc((8.417652003, 4.445), FILLET41_R, 169.165785029, 100.834214971)
            Line((4.051883336, 5.280517172), (3.964567963, 5.297227515))
            ThreePointArc((3.964567963, 5.297227515), (1.955412556, 2.694377477), (-0.070529112, 0.054118891))
            Line((-0.070529112, 0.054118891), (0, -0.0889))
            Line((0, -0.0889), (8.417652003, -0.0889))
            Line((8.417652003, -0.0889), (8.417652003, 0))
        make_face()
    extrude(amount=48.438260017, mode=Mode.SUBTRACT)
    with BuildSketch(Plane(origin=(-92.075, 36.5125, 73.191679691), x_dir=(1, 0, 0), z_dir=(0, -1, 0))) as fillet41_piece_3:
        with BuildLine():
            CenterArc((FILLET41_R, -FILLET41_R), FILLET41_R, 90, 90)
            Line((0, -FILLET41_R), (-FILLET41_R * 0.02, -FILLET41_R))
            Line((-FILLET41_R * 0.02, -FILLET41_R), (-FILLET41_R * 0.02, FILLET41_R * 0.02))
            Line((-FILLET41_R * 0.02, FILLET41_R * 0.02), (FILLET41_R, FILLET41_R * 0.02))
            Line((FILLET41_R, FILLET41_R * 0.02), (FILLET41_R, 0))
        make_face()
    extrude(amount=28.575, mode=Mode.SUBTRACT)

    # Fillet45
    # the kernel refuses this fillet: 3.175 mm, written as the material it takes off along each edge
    with BuildSketch(Plane(origin=(-113.0173, 19.05, 67.997686106), x_dir=(0, 1, 0), z_dir=(1, 0, 0))) as fillet45_piece_1:
        with BuildLine():
            CenterArc((FILLET45_R, -FILLET45_R), FILLET45_R, 90, 90)
            Line((0, -FILLET45_R), (0, 0))
            Line((0, 0), (FILLET45_R, 0))
        make_face()
    extrude(amount=20.9423, mode=Mode.SUBTRACT)
    with BuildSketch(Plane(origin=(113.0173, 19.05, 67.997686106), x_dir=(0, 1, 0), z_dir=(-1, 0, 0))) as fillet45_piece_2_section:
        with BuildLine():
            CenterArc((FILLET45_R, FILLET45_R), FILLET45_R, 180, 90)
            Line((0, FILLET45_R), (0, 0))
            Line((0, 0), (FILLET45_R, 0))
        make_face()
    fillet45_piece_2 = extrude(amount=28.8798, mode=Mode.PRIVATE)
    fillet45_piece_2 = fillet45_piece_2 - Plane(origin=(88.102772218, 19.593814114, 66.002834873), x_dir=(-0.7933533402910131, 0, -0.6087614290090101), z_dir=(0, 1, 0)) * Cylinder(4.445, 71, mode=Mode.PRIVATE)
    add(fillet45_piece_2, mode=Mode.SUBTRACT)


solid = part.part
